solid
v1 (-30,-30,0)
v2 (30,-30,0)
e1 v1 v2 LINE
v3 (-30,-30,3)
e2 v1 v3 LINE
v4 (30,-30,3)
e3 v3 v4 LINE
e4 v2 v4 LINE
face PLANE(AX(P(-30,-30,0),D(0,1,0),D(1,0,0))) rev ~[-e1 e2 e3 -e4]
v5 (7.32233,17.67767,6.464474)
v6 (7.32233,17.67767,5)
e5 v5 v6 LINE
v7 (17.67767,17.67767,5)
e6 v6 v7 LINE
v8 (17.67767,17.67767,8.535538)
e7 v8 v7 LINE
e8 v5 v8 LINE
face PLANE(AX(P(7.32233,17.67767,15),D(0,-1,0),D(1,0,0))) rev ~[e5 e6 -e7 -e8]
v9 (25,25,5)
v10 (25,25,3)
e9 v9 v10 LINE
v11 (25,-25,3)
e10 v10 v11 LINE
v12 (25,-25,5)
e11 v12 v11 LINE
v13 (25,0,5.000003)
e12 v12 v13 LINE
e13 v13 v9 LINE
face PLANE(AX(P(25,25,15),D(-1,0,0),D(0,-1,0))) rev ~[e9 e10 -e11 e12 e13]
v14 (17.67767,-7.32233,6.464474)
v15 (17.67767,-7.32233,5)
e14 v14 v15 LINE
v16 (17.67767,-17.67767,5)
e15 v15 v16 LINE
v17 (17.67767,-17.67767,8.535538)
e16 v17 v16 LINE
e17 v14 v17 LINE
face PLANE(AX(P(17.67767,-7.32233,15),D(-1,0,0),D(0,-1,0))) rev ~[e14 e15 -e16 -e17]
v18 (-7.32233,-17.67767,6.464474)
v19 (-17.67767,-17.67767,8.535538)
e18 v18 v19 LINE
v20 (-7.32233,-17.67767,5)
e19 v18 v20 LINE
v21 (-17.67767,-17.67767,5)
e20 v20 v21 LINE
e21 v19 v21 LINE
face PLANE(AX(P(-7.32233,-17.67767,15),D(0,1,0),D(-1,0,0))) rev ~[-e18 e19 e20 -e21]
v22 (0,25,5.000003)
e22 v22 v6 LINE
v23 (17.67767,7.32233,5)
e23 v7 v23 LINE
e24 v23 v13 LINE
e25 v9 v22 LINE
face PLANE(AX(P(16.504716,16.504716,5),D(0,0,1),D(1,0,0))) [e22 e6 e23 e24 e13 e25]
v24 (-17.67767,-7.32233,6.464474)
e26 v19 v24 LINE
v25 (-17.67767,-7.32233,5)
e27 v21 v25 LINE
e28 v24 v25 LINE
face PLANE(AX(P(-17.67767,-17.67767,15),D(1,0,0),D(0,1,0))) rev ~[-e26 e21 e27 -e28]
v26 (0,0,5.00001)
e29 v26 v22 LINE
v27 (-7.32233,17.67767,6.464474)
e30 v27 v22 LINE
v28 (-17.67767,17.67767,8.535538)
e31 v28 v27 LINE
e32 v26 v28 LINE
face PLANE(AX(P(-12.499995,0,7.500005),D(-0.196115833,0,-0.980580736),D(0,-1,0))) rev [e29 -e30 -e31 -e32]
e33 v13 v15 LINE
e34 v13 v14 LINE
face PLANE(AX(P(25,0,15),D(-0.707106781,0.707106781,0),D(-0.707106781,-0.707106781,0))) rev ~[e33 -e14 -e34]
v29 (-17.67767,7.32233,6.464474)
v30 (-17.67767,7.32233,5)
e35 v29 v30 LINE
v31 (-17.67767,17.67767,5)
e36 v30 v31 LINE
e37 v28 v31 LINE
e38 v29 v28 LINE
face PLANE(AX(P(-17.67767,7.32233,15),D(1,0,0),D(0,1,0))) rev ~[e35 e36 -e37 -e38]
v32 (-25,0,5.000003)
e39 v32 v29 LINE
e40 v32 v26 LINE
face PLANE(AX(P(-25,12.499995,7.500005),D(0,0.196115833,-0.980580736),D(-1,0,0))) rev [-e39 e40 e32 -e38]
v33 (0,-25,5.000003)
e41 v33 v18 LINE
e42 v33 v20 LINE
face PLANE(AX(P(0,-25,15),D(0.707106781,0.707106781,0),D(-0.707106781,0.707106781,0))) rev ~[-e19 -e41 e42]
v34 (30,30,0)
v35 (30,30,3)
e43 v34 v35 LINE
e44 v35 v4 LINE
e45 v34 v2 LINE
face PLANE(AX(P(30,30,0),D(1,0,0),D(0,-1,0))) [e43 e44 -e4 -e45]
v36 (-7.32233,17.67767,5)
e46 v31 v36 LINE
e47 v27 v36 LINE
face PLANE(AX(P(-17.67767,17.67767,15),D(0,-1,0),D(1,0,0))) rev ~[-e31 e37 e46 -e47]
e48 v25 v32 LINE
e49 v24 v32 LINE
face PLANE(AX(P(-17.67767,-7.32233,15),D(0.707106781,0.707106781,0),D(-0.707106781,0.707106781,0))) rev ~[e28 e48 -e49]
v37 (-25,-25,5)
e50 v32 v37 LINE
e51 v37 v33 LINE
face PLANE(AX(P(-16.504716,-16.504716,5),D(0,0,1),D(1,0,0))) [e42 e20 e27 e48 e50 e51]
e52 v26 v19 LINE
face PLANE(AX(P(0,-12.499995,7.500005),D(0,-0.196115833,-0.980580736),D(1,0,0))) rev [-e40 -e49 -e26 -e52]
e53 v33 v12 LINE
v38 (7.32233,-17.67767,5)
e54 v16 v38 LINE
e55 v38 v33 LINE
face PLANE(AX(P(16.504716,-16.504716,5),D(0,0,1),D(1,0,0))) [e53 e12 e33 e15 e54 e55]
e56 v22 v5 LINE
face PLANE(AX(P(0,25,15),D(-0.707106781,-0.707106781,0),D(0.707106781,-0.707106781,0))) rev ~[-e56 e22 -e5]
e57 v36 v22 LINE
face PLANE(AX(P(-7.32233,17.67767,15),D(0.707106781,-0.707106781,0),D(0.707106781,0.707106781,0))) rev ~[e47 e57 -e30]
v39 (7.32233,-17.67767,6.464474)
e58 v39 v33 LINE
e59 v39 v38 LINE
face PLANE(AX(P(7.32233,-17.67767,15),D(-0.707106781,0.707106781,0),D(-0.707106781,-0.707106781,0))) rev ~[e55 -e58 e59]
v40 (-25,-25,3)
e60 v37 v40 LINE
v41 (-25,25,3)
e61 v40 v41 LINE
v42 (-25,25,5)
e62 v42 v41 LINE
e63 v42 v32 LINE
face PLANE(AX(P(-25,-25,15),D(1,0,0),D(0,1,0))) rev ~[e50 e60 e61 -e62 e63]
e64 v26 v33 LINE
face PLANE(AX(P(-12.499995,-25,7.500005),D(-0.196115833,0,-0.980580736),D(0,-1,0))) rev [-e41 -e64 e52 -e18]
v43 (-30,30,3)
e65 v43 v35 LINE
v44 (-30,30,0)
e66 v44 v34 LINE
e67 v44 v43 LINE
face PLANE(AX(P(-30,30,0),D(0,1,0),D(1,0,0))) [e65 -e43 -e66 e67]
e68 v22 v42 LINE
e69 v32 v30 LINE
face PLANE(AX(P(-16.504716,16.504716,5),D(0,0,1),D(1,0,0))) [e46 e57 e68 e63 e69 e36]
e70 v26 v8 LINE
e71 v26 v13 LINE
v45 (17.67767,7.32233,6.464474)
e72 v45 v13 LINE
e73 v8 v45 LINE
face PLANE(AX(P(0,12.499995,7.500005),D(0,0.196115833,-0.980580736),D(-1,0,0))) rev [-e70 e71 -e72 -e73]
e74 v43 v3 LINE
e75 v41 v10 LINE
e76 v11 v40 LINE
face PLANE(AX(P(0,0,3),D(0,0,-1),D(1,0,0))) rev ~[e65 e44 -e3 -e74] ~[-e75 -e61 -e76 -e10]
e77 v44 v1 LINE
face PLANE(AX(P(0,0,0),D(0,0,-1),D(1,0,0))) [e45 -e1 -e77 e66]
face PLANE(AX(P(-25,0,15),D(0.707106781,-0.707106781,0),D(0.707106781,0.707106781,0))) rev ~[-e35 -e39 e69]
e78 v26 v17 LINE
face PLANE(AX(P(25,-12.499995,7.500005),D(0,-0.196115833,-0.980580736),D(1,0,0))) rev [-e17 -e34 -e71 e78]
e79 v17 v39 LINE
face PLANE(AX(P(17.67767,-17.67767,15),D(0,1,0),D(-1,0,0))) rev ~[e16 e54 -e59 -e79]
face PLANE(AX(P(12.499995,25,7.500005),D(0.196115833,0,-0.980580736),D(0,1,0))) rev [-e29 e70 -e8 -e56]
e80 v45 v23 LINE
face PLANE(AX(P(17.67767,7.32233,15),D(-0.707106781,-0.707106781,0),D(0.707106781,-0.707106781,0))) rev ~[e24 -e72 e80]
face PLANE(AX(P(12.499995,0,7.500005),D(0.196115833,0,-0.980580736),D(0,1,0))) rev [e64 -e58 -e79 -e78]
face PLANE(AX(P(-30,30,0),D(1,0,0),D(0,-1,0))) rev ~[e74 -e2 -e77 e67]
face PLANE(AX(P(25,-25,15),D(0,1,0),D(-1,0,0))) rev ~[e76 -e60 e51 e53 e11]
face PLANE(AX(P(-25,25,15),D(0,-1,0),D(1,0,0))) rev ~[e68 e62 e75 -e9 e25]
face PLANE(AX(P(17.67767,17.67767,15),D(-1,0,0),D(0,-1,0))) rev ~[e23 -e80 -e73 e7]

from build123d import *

# Parameters (mm, degrees)
F1_DEPTH = 10
F2_SIZE2 = 24.99999
F2_SIZE  = 4.99999
F4_COUNT = 4
F5_W     = 60
F5_H     = 60
F5_W_2   = 50
F5_H_2   = 50
F6_DEPTH = 15
F8_DEPTH = 10
F9_DEPTH = 12


# Not quite as in the source:
# - a fillet or chamfer is up to 0.001 mm smaller than in the source, because OpenCascade refuses the exact size


with BuildPart() as f1:
    # F0 (on Top) → F1 (new body)
    with BuildSketch(Plane.XY):
        Polygon((-25, 0), (0, 0), (-25, 25), align=None)
        Polygon((-25, 25), (0, 0), (0, 25), align=None)
    extrude(amount=F1_DEPTH)

    # F2 (size 5 and 25 in the source; OpenCascade refuses exactly that, so slightly less here)
    f2_edges = [f1.edges().sort_by_distance(p)[0] for p in [
        (-12.5, 0, 10),
        (0, 12.5, 10),
    ]]
    chamfer(f2_edges, length=F2_SIZE, length2=F2_SIZE2)


with BuildPart() as f4_1:
    # F4: instance of F1
    add(f1.part.rotate(Axis((0, 0, -0.4458203912), (0, 0, -1)), 1 * 360 / F4_COUNT))


with BuildPart() as f4_2:
    # F4: instance of F1
    add(f1.part.rotate(Axis((0, 0, -0.4458203912), (0, 0, -1)), 2 * 360 / F4_COUNT))


with BuildPart() as f4_3:
    # F4: instance of F1
    add(f1.part.rotate(Axis((0, 0, -0.4458203912), (0, 0, -1)), 3 * 360 / F4_COUNT))


with BuildPart() as f1_1:
    add(f1.part)

    add(f4_1.part)  # F6 merges F4_1

    add(f4_2.part)  # F6 merges F4_2

    add(f4_3.part)  # F6 merges F4_3
    # F5 (on face) → F6 (join)
    with BuildSketch(Plane(origin=(0, 0, 0), x_dir=(1, 0, 0), z_dir=(0, 0, -1))):
        Rectangle(F5_W, F5_H)
        Rectangle(F5_W_2, F5_H_2, mode=Mode.SUBTRACT)
    extrude(amount=-F6_DEPTH)

    # F7 (on face) → F8 (cut)
    with BuildSketch(Plane.XY.offset(15)):
        Polygon((25, 25), (0, 25), (7.3223304703, 17.6776695297), (17.6776695297, 17.6776695297), (17.6776695297, 7.3223304703), (25, 0), align=None)
        Polygon((-7.3223304703, 17.6776695297), (0, 25), (-25, 25), (-25, 0), (-17.6776695297, 7.3223304703), (-17.6776695297, 17.6776695297), align=None)
        Polygon((-17.6776695297, -7.3223304703), (-25, 0), (-25, -25), (0, -25), (-7.3223304703, -17.6776695297), (-17.6776695297, -17.6776695297), align=None)
        Polygon((25, -25), (25, 0), (17.6776695297, -7.3223304703), (17.6776695297, -17.6776695297), (7.3223304703, -17.6776695297), (0, -25), align=None)
    extrude(amount=-F8_DEPTH, mode=Mode.SUBTRACT)

    # F9 (cut): a face of the model
    f9_faces = [f1_1.faces().sort_by_distance(p)[0] for p in [
        (0, 29.1514718626, 15),
    ]]
    extrude(f9_faces, amount=-F9_DEPTH, mode=Mode.SUBTRACT)


solid = f1_1.part
